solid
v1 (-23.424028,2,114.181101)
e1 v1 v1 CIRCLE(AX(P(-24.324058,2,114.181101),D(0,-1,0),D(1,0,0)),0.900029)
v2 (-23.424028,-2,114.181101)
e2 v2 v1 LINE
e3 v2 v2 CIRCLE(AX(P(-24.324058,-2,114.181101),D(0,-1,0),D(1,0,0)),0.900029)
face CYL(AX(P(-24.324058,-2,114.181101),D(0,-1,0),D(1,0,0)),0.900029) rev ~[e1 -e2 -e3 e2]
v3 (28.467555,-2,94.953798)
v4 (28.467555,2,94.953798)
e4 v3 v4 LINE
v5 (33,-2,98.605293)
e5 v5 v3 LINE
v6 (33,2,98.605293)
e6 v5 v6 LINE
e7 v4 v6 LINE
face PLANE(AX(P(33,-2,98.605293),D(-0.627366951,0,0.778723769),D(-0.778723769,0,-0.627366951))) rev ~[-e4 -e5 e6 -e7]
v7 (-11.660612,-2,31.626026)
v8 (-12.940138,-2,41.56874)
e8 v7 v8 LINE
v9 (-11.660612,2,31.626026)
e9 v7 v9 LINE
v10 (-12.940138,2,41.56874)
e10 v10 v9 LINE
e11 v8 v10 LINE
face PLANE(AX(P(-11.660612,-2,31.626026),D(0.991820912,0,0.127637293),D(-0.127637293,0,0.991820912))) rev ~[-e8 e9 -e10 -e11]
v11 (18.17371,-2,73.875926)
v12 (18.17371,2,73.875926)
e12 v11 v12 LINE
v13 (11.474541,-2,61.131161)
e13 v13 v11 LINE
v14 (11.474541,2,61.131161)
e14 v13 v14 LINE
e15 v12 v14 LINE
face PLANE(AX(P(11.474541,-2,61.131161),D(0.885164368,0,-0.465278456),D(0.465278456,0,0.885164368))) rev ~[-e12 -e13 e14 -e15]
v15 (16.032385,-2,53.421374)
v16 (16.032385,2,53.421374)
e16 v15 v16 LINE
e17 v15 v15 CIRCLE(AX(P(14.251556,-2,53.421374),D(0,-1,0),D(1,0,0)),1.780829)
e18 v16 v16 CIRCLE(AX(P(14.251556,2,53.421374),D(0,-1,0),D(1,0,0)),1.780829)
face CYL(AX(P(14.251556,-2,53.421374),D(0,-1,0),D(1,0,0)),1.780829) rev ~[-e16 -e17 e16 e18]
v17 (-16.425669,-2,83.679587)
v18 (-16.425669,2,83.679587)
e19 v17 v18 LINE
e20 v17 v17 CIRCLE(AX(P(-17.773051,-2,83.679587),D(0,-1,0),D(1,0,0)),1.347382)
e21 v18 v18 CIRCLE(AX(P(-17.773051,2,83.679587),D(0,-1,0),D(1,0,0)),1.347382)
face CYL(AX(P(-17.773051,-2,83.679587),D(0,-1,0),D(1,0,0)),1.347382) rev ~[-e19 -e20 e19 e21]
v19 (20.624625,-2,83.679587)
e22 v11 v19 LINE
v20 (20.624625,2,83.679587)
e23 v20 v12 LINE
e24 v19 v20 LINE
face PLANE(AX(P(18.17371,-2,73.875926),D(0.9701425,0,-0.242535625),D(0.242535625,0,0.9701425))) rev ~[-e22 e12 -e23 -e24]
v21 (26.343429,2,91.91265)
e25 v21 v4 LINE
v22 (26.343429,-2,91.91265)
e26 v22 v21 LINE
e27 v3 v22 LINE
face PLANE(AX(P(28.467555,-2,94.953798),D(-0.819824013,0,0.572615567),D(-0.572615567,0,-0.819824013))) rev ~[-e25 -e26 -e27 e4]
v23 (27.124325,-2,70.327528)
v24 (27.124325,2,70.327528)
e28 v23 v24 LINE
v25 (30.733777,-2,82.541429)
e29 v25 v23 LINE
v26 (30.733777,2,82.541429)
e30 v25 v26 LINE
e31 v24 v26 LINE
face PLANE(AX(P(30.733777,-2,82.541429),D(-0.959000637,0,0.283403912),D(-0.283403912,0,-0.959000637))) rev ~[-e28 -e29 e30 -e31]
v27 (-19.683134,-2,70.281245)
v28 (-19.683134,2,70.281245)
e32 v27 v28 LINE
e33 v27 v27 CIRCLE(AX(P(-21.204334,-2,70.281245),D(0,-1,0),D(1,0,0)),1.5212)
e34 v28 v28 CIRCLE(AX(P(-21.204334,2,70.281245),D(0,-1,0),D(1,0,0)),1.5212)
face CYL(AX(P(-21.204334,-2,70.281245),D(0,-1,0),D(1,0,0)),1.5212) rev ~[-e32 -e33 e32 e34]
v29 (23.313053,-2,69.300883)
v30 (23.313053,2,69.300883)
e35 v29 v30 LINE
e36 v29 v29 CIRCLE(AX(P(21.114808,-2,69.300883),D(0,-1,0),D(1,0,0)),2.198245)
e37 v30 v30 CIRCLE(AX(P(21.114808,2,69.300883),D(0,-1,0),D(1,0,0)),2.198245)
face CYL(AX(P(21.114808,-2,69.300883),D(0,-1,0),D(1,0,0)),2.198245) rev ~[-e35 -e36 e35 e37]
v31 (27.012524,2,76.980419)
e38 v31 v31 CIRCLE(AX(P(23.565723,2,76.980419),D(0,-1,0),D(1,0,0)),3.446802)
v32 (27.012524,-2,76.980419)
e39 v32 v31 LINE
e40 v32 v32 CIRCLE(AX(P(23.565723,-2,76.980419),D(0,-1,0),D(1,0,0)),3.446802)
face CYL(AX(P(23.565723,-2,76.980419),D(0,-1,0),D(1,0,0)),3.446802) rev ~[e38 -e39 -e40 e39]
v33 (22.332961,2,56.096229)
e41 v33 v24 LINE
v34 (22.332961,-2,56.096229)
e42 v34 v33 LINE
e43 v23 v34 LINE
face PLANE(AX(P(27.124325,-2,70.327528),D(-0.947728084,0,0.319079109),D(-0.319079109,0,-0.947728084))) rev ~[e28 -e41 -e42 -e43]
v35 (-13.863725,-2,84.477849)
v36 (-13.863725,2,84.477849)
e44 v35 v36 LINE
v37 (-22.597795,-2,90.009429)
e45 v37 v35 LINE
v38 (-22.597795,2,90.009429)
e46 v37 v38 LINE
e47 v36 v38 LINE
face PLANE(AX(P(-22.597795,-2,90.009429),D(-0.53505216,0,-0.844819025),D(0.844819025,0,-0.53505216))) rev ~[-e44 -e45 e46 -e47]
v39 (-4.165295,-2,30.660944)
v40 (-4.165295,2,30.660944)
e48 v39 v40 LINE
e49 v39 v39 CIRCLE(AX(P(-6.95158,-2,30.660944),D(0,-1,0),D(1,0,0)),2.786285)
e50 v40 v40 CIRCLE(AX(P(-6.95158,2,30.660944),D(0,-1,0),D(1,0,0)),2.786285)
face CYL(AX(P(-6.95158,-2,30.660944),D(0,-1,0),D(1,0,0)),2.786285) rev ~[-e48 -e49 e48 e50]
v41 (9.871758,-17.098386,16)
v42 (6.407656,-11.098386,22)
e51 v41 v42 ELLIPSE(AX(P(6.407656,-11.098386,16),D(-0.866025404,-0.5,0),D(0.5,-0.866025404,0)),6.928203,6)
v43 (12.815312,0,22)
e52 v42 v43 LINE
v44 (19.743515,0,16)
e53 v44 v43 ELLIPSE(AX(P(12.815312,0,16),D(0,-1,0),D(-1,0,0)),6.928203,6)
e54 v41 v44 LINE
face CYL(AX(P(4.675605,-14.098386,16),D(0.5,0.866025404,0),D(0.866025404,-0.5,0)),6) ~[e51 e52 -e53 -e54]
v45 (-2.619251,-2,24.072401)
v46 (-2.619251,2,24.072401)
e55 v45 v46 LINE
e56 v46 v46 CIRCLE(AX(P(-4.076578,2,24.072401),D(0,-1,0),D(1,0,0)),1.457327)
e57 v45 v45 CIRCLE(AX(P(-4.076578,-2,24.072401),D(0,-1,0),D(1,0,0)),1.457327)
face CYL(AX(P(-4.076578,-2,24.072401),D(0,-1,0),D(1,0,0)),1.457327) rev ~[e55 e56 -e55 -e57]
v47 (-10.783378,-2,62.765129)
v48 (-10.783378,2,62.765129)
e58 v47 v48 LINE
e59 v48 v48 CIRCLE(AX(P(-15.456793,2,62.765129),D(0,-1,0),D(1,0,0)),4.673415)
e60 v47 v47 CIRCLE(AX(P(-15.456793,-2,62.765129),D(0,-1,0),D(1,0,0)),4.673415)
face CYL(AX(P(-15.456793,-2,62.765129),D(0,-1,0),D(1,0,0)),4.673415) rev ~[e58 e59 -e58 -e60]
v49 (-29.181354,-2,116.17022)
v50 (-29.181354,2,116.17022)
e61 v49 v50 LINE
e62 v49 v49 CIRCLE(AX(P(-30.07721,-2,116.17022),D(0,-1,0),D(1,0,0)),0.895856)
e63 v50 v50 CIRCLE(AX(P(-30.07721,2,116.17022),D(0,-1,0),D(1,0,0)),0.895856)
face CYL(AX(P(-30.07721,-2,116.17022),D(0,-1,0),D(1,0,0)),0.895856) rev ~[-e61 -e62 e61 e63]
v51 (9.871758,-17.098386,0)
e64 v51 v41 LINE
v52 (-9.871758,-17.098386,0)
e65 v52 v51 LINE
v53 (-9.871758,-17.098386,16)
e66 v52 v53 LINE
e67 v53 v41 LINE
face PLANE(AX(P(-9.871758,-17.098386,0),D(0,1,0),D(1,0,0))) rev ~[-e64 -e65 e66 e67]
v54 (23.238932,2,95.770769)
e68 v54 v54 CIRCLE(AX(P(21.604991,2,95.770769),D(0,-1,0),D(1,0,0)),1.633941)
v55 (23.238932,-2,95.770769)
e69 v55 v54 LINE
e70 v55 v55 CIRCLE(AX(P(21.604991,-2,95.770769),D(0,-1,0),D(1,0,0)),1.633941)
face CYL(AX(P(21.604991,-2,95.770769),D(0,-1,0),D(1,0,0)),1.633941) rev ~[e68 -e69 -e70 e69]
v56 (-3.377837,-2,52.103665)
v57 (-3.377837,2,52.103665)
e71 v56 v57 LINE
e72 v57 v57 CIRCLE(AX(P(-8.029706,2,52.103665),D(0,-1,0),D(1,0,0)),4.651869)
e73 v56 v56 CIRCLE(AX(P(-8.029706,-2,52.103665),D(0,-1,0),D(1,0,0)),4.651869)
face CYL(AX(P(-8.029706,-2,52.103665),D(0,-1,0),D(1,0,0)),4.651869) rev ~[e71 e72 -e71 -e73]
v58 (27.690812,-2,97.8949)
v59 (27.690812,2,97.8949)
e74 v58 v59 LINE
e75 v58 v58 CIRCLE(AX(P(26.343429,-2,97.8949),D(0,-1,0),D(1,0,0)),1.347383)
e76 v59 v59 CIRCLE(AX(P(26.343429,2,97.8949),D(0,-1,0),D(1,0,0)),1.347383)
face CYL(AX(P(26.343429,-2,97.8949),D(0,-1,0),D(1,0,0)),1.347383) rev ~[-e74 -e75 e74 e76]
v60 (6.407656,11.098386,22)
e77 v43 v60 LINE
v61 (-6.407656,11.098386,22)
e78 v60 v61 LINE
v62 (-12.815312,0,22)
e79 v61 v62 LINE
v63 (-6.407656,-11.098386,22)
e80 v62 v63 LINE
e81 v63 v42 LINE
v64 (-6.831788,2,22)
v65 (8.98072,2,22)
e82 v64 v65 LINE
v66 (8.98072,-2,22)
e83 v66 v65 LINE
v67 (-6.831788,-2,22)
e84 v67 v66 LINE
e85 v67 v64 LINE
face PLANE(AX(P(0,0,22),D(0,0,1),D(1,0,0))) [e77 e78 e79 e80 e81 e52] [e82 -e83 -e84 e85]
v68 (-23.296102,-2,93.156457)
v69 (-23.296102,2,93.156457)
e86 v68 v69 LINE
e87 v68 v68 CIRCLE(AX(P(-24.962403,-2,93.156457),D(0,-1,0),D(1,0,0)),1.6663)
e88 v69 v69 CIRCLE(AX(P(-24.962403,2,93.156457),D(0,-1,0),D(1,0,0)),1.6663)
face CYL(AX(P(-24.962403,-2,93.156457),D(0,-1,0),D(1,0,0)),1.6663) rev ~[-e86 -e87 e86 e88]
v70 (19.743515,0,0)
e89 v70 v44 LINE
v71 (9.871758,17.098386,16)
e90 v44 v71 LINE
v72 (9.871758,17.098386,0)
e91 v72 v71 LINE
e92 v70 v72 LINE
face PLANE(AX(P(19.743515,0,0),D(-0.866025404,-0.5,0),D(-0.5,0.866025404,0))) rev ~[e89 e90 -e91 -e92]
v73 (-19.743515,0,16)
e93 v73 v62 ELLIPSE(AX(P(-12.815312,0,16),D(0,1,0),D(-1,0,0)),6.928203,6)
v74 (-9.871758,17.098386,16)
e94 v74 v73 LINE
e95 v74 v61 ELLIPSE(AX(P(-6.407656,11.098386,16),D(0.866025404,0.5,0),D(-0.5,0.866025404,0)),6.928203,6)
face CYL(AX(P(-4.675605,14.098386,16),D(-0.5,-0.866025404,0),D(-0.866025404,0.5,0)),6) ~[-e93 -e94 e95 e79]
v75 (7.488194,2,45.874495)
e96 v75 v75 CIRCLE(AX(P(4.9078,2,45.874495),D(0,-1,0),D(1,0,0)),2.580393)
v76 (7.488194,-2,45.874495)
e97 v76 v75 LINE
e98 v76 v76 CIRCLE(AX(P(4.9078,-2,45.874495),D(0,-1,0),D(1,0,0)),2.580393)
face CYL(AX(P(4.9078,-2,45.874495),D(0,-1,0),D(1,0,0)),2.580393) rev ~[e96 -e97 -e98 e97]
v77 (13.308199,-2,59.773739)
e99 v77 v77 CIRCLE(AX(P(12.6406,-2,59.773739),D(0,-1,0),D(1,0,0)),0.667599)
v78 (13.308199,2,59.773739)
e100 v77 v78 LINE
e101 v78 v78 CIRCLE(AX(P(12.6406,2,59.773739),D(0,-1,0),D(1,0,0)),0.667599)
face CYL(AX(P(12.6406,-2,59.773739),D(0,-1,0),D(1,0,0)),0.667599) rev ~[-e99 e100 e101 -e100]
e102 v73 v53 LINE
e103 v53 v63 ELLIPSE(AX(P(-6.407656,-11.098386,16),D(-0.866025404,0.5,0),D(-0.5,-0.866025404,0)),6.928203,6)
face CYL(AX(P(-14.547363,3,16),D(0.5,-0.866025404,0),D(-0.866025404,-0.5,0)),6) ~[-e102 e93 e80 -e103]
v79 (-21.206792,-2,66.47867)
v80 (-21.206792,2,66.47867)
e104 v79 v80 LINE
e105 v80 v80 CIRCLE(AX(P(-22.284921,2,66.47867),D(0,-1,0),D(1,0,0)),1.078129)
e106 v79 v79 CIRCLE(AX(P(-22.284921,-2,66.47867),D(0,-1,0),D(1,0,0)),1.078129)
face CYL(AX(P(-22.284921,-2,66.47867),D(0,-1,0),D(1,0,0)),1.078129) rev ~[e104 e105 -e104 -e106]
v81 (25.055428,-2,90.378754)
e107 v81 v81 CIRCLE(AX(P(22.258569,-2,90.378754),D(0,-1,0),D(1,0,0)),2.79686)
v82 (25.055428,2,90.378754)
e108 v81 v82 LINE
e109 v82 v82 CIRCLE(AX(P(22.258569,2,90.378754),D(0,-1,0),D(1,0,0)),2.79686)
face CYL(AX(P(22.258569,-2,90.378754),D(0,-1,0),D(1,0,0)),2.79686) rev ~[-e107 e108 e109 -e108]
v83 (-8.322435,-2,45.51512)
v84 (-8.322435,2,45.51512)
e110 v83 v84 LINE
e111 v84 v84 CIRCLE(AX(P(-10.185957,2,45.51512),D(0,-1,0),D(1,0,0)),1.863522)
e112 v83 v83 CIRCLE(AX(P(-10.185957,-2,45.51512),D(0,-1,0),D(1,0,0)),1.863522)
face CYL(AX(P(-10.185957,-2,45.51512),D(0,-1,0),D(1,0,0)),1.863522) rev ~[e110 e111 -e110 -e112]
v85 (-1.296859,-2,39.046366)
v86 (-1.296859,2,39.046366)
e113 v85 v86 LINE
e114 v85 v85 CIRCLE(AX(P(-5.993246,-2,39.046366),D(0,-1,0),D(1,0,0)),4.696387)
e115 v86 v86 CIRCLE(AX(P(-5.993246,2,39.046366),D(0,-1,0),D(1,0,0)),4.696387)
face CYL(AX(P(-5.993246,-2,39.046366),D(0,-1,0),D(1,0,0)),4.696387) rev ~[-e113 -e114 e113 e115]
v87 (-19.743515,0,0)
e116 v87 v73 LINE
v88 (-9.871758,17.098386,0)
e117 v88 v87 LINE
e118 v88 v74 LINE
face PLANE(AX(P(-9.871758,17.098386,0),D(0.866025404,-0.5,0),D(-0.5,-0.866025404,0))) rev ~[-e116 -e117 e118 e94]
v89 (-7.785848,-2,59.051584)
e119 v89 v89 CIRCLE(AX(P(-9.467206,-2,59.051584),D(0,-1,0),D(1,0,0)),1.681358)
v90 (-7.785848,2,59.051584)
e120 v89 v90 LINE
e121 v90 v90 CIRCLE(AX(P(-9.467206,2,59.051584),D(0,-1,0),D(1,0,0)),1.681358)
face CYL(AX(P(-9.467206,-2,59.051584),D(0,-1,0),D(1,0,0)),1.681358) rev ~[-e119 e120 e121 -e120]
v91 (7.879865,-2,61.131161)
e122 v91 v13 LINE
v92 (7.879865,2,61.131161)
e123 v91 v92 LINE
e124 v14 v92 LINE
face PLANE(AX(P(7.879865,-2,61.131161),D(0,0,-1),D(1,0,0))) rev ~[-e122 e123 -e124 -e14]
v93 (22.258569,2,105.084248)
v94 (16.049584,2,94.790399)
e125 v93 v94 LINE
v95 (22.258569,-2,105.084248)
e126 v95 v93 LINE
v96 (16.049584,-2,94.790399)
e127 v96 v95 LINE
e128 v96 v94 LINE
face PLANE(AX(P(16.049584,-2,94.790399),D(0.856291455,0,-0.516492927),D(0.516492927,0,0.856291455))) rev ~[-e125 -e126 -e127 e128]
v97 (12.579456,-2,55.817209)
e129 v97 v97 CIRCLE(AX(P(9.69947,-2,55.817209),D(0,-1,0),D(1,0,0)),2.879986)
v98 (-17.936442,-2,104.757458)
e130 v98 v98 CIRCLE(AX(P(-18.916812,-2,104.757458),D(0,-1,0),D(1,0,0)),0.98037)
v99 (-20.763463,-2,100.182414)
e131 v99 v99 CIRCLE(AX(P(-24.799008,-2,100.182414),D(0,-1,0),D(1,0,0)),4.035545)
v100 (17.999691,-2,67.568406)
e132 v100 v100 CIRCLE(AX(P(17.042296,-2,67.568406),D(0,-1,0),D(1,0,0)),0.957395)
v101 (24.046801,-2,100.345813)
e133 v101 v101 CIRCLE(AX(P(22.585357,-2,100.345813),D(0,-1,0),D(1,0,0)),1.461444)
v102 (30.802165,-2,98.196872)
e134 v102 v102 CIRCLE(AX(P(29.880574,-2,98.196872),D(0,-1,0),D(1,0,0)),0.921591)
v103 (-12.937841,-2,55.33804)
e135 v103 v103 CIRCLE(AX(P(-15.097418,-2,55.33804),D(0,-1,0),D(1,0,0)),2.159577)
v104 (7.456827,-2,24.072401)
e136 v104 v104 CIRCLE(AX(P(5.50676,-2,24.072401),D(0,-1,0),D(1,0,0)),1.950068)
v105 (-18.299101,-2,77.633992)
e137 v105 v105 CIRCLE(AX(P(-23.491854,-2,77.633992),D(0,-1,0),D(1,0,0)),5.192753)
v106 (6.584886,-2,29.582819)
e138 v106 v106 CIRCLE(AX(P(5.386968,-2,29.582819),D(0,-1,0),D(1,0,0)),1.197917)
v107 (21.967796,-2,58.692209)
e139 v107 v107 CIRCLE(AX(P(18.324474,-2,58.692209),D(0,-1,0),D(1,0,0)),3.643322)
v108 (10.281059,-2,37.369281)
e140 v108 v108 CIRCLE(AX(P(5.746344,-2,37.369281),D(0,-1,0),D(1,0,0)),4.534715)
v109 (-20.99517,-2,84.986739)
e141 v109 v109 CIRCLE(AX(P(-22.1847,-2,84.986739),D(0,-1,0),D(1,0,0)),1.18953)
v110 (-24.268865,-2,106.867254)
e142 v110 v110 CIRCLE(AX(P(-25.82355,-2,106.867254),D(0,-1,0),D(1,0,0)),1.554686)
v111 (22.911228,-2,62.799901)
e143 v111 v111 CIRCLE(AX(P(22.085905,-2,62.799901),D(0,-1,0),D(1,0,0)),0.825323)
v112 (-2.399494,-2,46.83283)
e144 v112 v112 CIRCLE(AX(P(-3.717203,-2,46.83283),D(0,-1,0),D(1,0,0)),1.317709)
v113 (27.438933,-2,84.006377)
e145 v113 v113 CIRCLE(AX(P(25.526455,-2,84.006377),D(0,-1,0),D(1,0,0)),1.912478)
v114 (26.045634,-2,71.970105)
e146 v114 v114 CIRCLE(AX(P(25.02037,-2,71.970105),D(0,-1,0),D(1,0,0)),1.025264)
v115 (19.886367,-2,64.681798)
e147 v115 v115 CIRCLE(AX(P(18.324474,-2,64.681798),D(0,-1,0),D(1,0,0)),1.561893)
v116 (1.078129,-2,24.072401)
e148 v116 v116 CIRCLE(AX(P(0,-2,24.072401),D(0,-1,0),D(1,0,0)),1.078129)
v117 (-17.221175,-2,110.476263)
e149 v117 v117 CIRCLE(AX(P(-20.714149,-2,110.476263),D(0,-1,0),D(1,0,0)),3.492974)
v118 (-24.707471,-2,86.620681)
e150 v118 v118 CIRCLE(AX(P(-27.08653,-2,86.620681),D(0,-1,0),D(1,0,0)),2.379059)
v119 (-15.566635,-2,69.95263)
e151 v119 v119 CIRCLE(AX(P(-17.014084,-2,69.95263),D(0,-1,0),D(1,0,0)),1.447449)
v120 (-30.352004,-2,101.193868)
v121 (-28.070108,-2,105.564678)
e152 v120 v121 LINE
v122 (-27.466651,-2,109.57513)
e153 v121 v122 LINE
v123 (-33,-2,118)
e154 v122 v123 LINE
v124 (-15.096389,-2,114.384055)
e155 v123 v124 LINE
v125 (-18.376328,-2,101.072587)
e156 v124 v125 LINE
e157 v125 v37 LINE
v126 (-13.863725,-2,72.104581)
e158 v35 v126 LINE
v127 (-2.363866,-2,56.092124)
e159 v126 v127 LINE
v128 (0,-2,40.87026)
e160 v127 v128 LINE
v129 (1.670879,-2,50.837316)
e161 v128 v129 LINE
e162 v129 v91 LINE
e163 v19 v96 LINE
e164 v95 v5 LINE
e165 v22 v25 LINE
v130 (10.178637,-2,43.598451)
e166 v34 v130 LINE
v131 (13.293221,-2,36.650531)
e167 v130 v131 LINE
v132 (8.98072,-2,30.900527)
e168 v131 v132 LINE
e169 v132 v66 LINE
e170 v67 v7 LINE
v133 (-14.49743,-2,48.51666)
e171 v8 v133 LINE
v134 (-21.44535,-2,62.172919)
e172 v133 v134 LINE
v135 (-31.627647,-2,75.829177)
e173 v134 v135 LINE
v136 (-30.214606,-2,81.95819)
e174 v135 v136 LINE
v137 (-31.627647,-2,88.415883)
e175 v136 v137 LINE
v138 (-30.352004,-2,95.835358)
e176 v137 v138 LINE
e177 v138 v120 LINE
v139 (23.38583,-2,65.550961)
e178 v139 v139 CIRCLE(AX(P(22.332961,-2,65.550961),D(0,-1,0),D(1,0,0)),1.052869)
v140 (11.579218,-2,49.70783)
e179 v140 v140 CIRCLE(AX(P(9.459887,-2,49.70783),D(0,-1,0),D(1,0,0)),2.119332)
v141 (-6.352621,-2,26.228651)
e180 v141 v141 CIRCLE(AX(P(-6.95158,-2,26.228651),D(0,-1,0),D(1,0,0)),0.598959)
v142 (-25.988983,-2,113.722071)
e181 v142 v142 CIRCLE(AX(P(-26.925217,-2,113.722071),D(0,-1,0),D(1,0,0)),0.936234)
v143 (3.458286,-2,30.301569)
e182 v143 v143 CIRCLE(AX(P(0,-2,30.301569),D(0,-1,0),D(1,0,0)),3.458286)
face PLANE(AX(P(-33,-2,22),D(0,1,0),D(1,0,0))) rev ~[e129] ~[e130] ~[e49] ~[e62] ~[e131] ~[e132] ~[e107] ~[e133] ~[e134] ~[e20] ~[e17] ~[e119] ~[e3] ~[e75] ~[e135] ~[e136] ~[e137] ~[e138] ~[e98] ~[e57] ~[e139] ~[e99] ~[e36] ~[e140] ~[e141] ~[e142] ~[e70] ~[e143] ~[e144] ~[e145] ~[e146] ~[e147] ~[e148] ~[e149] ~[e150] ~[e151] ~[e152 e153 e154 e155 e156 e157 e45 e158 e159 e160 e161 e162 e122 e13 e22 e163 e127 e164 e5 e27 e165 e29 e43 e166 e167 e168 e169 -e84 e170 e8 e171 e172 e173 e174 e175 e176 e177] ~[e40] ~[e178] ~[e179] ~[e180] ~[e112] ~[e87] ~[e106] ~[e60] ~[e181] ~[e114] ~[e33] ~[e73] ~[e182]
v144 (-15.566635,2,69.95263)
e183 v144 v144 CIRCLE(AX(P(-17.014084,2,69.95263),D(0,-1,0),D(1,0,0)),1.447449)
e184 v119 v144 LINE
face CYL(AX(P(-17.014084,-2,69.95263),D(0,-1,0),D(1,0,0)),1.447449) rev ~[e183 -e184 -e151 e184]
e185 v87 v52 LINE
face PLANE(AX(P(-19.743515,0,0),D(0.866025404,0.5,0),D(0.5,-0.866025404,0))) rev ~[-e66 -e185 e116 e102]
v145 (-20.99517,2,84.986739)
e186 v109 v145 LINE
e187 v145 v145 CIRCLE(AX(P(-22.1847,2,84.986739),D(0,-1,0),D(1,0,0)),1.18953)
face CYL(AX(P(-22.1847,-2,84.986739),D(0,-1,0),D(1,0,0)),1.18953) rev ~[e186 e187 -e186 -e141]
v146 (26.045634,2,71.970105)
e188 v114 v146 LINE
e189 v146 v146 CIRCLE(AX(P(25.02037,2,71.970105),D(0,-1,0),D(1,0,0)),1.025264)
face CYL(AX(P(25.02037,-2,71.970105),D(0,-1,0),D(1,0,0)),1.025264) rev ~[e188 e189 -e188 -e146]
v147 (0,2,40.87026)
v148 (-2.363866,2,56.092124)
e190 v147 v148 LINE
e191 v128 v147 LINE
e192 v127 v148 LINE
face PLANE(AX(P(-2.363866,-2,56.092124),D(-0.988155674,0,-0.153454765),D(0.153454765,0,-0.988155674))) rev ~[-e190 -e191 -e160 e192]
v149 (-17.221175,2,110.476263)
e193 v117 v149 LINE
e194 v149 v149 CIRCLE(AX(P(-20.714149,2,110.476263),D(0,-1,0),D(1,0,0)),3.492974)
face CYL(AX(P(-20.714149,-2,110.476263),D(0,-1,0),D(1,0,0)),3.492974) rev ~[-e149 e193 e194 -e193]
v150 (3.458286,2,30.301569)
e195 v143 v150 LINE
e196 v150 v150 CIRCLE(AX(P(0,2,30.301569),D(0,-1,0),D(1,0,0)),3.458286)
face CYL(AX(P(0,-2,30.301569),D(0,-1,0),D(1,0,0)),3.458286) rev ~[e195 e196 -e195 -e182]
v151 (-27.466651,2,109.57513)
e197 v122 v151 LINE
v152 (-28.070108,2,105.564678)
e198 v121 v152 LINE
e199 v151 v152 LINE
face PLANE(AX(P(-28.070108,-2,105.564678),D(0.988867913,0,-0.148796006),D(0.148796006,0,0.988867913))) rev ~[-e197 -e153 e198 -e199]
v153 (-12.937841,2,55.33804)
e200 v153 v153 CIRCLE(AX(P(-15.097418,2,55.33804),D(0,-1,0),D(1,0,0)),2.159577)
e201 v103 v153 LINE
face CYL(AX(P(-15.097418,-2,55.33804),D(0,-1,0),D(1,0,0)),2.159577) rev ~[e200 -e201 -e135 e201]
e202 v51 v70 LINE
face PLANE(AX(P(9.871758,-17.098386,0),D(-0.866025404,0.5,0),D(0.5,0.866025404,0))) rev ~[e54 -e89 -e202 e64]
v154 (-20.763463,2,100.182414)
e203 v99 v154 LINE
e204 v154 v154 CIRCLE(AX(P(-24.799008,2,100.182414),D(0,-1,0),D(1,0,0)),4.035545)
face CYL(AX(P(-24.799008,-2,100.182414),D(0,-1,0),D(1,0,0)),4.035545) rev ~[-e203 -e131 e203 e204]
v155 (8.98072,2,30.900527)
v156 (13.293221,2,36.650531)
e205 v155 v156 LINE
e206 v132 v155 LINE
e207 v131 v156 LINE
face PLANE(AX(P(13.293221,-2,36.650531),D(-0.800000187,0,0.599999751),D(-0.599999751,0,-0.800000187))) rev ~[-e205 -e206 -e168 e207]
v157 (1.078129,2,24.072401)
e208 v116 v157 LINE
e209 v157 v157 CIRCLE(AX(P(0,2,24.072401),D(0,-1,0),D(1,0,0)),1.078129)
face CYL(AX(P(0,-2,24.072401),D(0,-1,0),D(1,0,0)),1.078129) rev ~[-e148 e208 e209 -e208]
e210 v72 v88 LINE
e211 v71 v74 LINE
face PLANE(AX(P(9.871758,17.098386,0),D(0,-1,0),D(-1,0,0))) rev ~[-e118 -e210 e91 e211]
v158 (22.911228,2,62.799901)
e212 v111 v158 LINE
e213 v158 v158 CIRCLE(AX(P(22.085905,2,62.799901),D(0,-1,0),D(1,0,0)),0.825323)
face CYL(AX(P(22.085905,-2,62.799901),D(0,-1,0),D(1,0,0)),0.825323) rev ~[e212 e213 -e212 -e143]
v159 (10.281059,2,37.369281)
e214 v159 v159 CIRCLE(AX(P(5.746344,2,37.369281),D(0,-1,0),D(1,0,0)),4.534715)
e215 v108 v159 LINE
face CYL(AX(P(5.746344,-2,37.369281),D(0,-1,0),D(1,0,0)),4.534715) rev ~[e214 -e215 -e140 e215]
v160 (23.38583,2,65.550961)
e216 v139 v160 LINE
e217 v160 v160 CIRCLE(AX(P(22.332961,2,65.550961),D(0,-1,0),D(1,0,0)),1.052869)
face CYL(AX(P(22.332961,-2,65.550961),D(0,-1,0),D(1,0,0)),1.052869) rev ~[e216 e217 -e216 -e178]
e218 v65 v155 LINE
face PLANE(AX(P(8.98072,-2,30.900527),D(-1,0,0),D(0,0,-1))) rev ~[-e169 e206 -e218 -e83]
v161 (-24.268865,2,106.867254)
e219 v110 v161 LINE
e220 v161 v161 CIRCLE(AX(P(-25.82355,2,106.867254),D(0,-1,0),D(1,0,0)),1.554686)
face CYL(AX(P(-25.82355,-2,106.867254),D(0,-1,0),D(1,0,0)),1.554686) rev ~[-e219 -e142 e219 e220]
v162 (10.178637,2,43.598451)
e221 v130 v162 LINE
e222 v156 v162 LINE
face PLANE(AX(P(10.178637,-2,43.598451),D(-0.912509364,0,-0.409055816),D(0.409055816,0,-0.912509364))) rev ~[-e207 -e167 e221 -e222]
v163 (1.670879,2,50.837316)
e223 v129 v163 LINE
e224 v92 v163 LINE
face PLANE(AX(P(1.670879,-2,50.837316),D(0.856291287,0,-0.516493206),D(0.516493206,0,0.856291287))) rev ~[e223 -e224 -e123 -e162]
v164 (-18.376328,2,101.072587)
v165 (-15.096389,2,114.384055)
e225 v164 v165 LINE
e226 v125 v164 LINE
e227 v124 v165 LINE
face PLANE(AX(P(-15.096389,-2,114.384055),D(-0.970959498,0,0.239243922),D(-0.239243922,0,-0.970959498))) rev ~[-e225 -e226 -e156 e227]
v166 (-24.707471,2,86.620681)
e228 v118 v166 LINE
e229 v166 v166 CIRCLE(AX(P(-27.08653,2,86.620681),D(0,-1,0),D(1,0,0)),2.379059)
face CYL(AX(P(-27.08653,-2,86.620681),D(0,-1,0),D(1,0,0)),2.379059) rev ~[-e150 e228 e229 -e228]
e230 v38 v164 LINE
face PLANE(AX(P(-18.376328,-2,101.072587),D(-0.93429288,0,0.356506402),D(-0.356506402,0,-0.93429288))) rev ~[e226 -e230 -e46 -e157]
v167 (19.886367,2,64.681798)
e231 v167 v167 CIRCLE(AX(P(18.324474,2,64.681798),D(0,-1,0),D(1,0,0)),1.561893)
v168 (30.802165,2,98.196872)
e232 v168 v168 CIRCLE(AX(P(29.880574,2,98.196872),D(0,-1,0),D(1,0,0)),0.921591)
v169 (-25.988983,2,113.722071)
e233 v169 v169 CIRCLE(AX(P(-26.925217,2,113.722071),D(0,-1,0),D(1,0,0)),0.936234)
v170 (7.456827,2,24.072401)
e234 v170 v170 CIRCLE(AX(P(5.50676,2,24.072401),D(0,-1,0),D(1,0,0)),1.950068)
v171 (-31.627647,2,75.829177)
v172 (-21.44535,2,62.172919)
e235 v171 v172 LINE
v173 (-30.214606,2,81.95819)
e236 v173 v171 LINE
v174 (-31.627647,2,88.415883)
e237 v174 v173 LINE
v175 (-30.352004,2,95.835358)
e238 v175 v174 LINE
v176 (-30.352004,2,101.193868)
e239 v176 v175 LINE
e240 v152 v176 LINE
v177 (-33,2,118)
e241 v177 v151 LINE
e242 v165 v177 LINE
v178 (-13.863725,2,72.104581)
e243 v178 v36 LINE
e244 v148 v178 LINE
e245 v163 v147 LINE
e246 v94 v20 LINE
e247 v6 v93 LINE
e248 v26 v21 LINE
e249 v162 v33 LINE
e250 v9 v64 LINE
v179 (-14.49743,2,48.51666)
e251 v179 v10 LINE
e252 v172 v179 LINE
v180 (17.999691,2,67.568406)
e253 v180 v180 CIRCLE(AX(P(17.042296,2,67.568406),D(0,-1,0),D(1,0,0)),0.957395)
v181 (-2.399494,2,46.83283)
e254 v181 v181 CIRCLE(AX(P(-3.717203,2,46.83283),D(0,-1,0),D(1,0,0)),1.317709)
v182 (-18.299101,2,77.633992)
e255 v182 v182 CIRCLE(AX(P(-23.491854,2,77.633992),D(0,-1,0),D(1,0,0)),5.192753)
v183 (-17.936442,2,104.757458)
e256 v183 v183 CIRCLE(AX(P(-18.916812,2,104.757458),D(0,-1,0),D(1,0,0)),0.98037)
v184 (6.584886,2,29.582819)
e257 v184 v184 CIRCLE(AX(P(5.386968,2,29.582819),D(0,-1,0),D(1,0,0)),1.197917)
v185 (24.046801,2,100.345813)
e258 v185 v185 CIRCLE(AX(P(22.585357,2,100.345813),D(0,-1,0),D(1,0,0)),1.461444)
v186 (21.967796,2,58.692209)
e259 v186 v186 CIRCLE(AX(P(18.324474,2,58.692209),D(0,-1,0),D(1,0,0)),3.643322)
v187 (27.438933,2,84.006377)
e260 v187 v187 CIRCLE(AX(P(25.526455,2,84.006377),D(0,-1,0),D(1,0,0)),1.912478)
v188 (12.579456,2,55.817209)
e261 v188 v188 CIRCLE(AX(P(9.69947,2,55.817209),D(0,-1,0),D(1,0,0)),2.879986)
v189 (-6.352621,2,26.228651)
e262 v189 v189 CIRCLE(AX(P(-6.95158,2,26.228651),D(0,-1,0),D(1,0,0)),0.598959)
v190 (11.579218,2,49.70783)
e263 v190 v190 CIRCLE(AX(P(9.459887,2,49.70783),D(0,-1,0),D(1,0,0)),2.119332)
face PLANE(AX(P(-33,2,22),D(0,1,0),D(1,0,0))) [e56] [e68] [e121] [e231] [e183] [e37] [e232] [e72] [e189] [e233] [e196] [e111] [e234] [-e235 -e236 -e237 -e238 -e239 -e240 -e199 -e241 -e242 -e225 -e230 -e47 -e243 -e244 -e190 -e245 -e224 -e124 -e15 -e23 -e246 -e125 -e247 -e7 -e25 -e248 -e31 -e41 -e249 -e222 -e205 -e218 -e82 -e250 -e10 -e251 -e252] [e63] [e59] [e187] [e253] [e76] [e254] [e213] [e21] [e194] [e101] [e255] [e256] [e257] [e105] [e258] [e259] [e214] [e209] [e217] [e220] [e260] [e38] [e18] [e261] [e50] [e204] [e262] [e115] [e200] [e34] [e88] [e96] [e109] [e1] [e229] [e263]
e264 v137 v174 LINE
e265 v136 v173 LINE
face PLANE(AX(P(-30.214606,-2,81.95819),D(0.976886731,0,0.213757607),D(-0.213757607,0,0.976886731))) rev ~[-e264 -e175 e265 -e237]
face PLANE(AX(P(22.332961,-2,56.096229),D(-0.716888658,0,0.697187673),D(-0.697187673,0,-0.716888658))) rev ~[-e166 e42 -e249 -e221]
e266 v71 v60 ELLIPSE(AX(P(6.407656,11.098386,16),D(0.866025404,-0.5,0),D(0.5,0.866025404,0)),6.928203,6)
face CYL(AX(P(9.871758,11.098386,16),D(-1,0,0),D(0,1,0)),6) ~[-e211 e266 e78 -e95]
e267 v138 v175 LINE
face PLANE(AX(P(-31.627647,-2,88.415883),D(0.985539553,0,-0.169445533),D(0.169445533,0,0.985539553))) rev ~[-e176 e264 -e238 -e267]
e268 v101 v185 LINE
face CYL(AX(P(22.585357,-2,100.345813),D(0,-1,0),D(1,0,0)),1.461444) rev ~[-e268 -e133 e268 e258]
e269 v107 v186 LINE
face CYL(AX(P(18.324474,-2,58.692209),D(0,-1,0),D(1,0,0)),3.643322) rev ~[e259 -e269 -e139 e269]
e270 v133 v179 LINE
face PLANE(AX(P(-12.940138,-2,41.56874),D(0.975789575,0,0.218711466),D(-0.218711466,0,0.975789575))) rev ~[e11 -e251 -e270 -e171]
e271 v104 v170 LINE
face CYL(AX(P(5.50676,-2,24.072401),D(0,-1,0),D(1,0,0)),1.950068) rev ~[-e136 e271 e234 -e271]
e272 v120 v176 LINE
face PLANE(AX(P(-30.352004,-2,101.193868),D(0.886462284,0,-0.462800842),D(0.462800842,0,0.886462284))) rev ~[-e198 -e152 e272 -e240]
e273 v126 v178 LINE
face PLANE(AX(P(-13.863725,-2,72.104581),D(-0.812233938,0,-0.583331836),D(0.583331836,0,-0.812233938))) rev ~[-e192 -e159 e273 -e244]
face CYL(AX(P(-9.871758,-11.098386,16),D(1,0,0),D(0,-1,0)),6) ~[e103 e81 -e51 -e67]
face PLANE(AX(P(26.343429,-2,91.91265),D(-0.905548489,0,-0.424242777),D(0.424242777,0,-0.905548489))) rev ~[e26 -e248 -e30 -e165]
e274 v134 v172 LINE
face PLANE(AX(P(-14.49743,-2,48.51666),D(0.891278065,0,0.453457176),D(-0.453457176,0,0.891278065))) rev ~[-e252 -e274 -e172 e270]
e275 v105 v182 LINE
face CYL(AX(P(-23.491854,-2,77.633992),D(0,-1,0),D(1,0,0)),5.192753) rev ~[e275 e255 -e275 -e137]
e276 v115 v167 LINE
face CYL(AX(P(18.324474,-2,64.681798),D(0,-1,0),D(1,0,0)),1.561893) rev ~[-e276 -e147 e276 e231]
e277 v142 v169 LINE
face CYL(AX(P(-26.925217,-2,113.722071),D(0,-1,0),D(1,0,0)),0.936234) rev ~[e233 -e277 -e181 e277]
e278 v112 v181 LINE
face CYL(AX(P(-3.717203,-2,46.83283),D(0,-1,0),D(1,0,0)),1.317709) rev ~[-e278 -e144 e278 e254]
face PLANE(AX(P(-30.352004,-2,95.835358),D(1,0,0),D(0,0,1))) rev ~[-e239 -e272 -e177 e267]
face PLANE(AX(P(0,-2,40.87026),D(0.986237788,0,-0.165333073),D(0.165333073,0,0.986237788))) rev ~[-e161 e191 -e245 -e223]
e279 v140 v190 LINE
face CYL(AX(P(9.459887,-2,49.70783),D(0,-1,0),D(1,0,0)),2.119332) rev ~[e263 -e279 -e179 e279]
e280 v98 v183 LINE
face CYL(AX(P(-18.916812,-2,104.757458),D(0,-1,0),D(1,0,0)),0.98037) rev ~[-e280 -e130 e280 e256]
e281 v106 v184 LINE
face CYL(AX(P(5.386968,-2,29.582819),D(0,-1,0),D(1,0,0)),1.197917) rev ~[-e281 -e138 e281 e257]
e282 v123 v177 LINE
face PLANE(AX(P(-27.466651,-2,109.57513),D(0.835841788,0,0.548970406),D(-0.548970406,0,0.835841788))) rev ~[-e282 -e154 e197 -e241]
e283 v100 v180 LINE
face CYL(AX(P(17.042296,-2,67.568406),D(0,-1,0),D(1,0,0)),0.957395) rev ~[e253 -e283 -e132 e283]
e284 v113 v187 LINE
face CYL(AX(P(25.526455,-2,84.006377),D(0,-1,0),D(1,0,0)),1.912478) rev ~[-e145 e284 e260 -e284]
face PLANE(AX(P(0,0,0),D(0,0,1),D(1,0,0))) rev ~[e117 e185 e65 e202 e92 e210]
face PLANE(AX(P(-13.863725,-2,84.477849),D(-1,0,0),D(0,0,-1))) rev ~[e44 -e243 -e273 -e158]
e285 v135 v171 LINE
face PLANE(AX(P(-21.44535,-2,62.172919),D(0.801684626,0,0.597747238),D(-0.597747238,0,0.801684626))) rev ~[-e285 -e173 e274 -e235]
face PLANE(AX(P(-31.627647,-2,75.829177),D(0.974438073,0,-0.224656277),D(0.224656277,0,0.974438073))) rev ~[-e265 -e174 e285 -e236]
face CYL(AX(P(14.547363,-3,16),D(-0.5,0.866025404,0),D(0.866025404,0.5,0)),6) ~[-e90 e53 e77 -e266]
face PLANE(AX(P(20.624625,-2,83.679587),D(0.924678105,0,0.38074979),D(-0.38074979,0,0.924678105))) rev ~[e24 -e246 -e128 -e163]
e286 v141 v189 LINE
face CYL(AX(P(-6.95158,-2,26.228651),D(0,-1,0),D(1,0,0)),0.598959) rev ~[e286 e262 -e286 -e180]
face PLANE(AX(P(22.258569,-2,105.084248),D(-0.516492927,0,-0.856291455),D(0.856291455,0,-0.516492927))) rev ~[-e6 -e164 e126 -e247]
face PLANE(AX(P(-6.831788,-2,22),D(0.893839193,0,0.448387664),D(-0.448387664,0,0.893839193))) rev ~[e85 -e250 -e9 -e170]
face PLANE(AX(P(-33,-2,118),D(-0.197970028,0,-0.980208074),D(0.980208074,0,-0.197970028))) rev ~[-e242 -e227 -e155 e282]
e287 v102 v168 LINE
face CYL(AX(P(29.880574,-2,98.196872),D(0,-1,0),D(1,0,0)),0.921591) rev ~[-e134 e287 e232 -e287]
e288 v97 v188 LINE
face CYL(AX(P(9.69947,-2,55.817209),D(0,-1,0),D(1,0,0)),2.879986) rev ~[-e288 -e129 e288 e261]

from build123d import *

# Parameters (mm, degrees)
F1_DEPTH = 22
F2_R     = 6
F3_W     = 66
F3_H     = 4
F4_DEPTH = 96
F5_R     = 4.6734146419
F5_R_2   = 4.6518685429
F5_R_3   = 4.696387476
F5_R_4   = 4.5347148874
F5_R_5   = 2.5803932982
F5_R_6   = 2.1193315606
F5_R_7   = 2.8799856964
F5_R_8   = 3.6433218135
F5_R_9   = 1.5618927534
F5_R_10  = 1.780828752
F5_R_11  = 1.3177092187
F5_R_12  = 1.8635222484
F5_R_13  = 1.68135752
F5_R_14  = 2.1595766427
F5_R_15  = 1.0781288147
F5_R_16  = 1.4474492092
F5_R_17  = 2.7862850737
F5_R_18  = 3.4582862602
F5_R_19  = 1.9500679084
F5_R_20  = 1.1979173869
F5_R_21  = 1.4573267426
F5_R_22  = 1.0781294395
F5_R_23  = 0.5989588797
F5_R_24  = 3.4929735647
F5_R_25  = 4.0355453194
F5_R_26  = 5.1927529479
F5_R_27  = 2.3790588204
F5_R_28  = 2.1982450571
F5_R_29  = 3.4468016913
F5_R_30  = 2.7968598425
F5_R_31  = 1.4614439331
F5_R_32  = 1.3473825629
F5_R_33  = 1.6339413822
F5_R_34  = 1.9124784447
F5_R_35  = 1.6663004851
F5_R_36  = 1.3473821111
F5_R_37  = 1.521199858
F5_R_38  = 1.189529666
F5_R_39  = 0.9803697467
F5_R_40  = 0.8958556794
F5_R_41  = 0.9362344169
F5_R_42  = 0.9000294175
F5_R_43  = 1.5546857265
F5_R_44  = 1.0528691723
F5_R_45  = 0.9573948707
F5_R_46  = 1.0252641854
F5_R_47  = 0.8253231645
F5_R_48  = 0.6675992995
F5_R_49  = 0.9215911414
F6_DEPTH = 19.0993858407


# Not quite as in the source:
# - a feature names something its author has since deleted; it is built from what else it names


with BuildPart() as f1:
    # F0 (on Top) → F1 (new body)
    with BuildSketch(Plane.XY):
        Polygon((9.8717576678, 17.0983858407), (-9.8717576678, 17.0983858407), (-19.7435153356, 0), (-9.8717576678, -17.0983858407), (9.8717576678, -17.0983858407), (19.7435153356, 0), align=None)
    extrude(amount=F1_DEPTH)

    # F2
    f2_edges = [f1.edges().sort_by_distance(p)[0] for p in [
        (14.807637, 8.549193, 22),
        (0, 17.098386, 22),
        (-14.807637, 8.549193, 22),
        (-14.807637, -8.549193, 22),
        (0, -17.098386, 22),
        (14.807637, -8.549193, 22),
    ]]
    fillet(f2_edges, radius=F2_R)

    # F3 (on face) → F4 (join)
    with BuildSketch(Plane.XY.offset(22)):
        Rectangle(F3_W, F3_H)
    extrude(amount=F4_DEPTH)

    # F5 (on face) → F6 (cut, through all)
    with BuildSketch(Plane.XZ.offset(2)):
        with Locations((-15.4567928985, 62.7651289105)):
            Circle(F5_R)
        with Locations((-8.0297058448, 52.103664726)):
            Circle(F5_R_2)
        with Locations((-5.9932461008, 39.0463657677)):
            Circle(F5_R_3)
        with Locations((5.7463436387, 37.3692810535)):
            Circle(F5_R_4)
        with Locations((4.9078003503, 45.8744950593)):
            Circle(F5_R_5)
        with Locations((9.4598866999, 49.7078299522)):
            Circle(F5_R_6)
        with Locations((9.6994703636, 55.8172091842)):
            Circle(F5_R_7)
        with Locations((18.3244738728, 58.6922094226)):
            Circle(F5_R_8)
        with Locations((18.3244738728, 64.6817982197)):
            Circle(F5_R_9)
        with Locations((14.2515562475, 53.4213744104)):
            Circle(F5_R_10)
        with Locations((-3.7172031589, 46.8328297138)):
            Circle(F5_R_11)
        with Locations((-10.185956955, 45.5151200294)):
            Circle(F5_R_12)
        with Locations((-9.467205964, 59.0515844524)):
            Circle(F5_R_13)
        with Locations((-15.0974178687, 55.3380399942)):
            Circle(F5_R_14)
        with Locations((-22.2849212587, 66.4786696434)):
            Circle(F5_R_15)
        with Locations((-17.0140843838, 69.9526295066)):
            Circle(F5_R_16)
        with Locations((-6.9515802898, 30.6609440595)):
            Circle(F5_R_17)
        with Locations((0, 30.3015690297)):
            Circle(F5_R_18)
        with Locations((5.5067595094, 24.0724012256)):
            Circle(F5_R_19)
        with Locations((5.3869681433, 29.5828189701)):
            Circle(F5_R_20)
        with Locations((-4.0765781887, 24.0724012256)):
            Circle(F5_R_21)
        with Locations((0, 24.0724012256)):
            Circle(F5_R_22)
        with Locations((-6.9515802898, 26.2286514044)):
            Circle(F5_R_23)
        with Locations((-20.7141488791, 110.4762628675)):
            Circle(F5_R_24)
        with Locations((-24.7990079224, 100.1824140549)):
            Circle(F5_R_25)
        with Locations((-23.4918538481, 77.6339918375)):
            Circle(F5_R_26)
        with Locations((-27.0865298808, 86.6206809878)):
            Circle(F5_R_27)
        with Locations((21.1148075759, 69.3008825183)):
            Circle(F5_R_28)
        with Locations((23.5657226294, 76.980419457)):
            Circle(F5_R_29)
        with Locations((22.2585685551, 90.3787538409)):
            Circle(F5_R_30)
        with Locations((22.585356608, 100.3458127379)):
            Circle(F5_R_31)
        with Locations((26.3434294611, 97.8948995471)):
            Circle(F5_R_32)
        with Locations((21.6049905866, 95.7707688212)):
            Circle(F5_R_33)
        with Locations((25.5264546722, 84.0063765645)):
            Circle(F5_R_34)
        with Locations((-24.9624028802, 93.1564569473)):
            Circle(F5_R_35)
        with Locations((-17.7730508149, 83.6795866489)):
            Circle(F5_R_36)
        with Locations((-21.2043337524, 70.2812448144)):
            Circle(F5_R_37)
        with Locations((-22.1846997738, 84.9867388606)):
            Circle(F5_R_38)
        with Locations((-18.916811794, 104.7574579716)):
            Circle(F5_R_39)
        with Locations((-30.0772096962, 116.170220077)):
            Circle(F5_R_40)
        with Locations((-26.9252173603, 113.7220710516)):
            Circle(F5_R_41)
        with Locations((-24.3240576237, 114.1811013222)):
            Circle(F5_R_42)
        with Locations((-25.8235502988, 106.8672537804)):
            Circle(F5_R_43)
        with Locations((22.332961016, 65.5509606004)):
            Circle(F5_R_44)
        with Locations((17.0422960073, 67.5684064627)):
            Circle(F5_R_45)
        with Locations((25.0203702599, 71.9701051712)):
            Circle(F5_R_46)
        with Locations((22.0859050751, 62.7999007702)):
            Circle(F5_R_47)
        with Locations((12.6406000927, 59.7737394273)):
            Circle(F5_R_48)
        with Locations((29.8805739731, 98.1968715787)):
            Circle(F5_R_49)
        Polygon((-11.660611567, 22), (-6.8317884579, 22), (-11.660611567, 31.6260260755), (-12.9401380399, 41.5687402004), (-14.4974304566, 48.5166599268), (-21.445350183, 62.1729185099), (-31.6276470402, 75.8291770929), (-30.214605853, 81.9581896067), (-31.6276470402, 88.4158834815), (-30.3520038724, 95.8353579044), (-30.3520038724, 101.1938676238), (-28.0701080944, 105.5646776068), (-27.4666510522, 109.5751300454), (-33, 118), (-33, 22), align=None)
        Polygon((33, 118), (-33, 118), (-15.0963891501, 114.3840551376), (-18.3763280511, 101.0725870728), (-22.5977953523, 90.0094285607), (-13.8637246564, 84.4778493047), (-13.8637246564, 72.1045807004), (-2.3638659623, 56.0921244323), (0, 40.8702604473), (1.6708788462, 50.837315619), (7.8798653558, 61.1311607063), (11.4745413885, 61.1311607063), (18.1737095118, 73.875926435), (20.6246245652, 83.6795866489), (16.0495843738, 94.7903990746), (22.2585685551, 105.0842478871), (33, 98.6052934028), align=None)
        Polygon((8.980720304, 30.9005267918), (8.980720304, 22), (11.660611567, 22), (33, 22), (33, 98.6052934028), (28.467554599, 94.9537977576), (26.3434294611, 91.9126495719), (30.7337772995, 82.5414285064), (27.1243248135, 70.3275278211), (22.332961016, 56.0962293618), (10.1786367595, 43.5984507203), (13.2932206616, 36.6505309939), align=None)
    extrude(amount=-F6_DEPTH, mode=Mode.SUBTRACT)


solid = f1.part
